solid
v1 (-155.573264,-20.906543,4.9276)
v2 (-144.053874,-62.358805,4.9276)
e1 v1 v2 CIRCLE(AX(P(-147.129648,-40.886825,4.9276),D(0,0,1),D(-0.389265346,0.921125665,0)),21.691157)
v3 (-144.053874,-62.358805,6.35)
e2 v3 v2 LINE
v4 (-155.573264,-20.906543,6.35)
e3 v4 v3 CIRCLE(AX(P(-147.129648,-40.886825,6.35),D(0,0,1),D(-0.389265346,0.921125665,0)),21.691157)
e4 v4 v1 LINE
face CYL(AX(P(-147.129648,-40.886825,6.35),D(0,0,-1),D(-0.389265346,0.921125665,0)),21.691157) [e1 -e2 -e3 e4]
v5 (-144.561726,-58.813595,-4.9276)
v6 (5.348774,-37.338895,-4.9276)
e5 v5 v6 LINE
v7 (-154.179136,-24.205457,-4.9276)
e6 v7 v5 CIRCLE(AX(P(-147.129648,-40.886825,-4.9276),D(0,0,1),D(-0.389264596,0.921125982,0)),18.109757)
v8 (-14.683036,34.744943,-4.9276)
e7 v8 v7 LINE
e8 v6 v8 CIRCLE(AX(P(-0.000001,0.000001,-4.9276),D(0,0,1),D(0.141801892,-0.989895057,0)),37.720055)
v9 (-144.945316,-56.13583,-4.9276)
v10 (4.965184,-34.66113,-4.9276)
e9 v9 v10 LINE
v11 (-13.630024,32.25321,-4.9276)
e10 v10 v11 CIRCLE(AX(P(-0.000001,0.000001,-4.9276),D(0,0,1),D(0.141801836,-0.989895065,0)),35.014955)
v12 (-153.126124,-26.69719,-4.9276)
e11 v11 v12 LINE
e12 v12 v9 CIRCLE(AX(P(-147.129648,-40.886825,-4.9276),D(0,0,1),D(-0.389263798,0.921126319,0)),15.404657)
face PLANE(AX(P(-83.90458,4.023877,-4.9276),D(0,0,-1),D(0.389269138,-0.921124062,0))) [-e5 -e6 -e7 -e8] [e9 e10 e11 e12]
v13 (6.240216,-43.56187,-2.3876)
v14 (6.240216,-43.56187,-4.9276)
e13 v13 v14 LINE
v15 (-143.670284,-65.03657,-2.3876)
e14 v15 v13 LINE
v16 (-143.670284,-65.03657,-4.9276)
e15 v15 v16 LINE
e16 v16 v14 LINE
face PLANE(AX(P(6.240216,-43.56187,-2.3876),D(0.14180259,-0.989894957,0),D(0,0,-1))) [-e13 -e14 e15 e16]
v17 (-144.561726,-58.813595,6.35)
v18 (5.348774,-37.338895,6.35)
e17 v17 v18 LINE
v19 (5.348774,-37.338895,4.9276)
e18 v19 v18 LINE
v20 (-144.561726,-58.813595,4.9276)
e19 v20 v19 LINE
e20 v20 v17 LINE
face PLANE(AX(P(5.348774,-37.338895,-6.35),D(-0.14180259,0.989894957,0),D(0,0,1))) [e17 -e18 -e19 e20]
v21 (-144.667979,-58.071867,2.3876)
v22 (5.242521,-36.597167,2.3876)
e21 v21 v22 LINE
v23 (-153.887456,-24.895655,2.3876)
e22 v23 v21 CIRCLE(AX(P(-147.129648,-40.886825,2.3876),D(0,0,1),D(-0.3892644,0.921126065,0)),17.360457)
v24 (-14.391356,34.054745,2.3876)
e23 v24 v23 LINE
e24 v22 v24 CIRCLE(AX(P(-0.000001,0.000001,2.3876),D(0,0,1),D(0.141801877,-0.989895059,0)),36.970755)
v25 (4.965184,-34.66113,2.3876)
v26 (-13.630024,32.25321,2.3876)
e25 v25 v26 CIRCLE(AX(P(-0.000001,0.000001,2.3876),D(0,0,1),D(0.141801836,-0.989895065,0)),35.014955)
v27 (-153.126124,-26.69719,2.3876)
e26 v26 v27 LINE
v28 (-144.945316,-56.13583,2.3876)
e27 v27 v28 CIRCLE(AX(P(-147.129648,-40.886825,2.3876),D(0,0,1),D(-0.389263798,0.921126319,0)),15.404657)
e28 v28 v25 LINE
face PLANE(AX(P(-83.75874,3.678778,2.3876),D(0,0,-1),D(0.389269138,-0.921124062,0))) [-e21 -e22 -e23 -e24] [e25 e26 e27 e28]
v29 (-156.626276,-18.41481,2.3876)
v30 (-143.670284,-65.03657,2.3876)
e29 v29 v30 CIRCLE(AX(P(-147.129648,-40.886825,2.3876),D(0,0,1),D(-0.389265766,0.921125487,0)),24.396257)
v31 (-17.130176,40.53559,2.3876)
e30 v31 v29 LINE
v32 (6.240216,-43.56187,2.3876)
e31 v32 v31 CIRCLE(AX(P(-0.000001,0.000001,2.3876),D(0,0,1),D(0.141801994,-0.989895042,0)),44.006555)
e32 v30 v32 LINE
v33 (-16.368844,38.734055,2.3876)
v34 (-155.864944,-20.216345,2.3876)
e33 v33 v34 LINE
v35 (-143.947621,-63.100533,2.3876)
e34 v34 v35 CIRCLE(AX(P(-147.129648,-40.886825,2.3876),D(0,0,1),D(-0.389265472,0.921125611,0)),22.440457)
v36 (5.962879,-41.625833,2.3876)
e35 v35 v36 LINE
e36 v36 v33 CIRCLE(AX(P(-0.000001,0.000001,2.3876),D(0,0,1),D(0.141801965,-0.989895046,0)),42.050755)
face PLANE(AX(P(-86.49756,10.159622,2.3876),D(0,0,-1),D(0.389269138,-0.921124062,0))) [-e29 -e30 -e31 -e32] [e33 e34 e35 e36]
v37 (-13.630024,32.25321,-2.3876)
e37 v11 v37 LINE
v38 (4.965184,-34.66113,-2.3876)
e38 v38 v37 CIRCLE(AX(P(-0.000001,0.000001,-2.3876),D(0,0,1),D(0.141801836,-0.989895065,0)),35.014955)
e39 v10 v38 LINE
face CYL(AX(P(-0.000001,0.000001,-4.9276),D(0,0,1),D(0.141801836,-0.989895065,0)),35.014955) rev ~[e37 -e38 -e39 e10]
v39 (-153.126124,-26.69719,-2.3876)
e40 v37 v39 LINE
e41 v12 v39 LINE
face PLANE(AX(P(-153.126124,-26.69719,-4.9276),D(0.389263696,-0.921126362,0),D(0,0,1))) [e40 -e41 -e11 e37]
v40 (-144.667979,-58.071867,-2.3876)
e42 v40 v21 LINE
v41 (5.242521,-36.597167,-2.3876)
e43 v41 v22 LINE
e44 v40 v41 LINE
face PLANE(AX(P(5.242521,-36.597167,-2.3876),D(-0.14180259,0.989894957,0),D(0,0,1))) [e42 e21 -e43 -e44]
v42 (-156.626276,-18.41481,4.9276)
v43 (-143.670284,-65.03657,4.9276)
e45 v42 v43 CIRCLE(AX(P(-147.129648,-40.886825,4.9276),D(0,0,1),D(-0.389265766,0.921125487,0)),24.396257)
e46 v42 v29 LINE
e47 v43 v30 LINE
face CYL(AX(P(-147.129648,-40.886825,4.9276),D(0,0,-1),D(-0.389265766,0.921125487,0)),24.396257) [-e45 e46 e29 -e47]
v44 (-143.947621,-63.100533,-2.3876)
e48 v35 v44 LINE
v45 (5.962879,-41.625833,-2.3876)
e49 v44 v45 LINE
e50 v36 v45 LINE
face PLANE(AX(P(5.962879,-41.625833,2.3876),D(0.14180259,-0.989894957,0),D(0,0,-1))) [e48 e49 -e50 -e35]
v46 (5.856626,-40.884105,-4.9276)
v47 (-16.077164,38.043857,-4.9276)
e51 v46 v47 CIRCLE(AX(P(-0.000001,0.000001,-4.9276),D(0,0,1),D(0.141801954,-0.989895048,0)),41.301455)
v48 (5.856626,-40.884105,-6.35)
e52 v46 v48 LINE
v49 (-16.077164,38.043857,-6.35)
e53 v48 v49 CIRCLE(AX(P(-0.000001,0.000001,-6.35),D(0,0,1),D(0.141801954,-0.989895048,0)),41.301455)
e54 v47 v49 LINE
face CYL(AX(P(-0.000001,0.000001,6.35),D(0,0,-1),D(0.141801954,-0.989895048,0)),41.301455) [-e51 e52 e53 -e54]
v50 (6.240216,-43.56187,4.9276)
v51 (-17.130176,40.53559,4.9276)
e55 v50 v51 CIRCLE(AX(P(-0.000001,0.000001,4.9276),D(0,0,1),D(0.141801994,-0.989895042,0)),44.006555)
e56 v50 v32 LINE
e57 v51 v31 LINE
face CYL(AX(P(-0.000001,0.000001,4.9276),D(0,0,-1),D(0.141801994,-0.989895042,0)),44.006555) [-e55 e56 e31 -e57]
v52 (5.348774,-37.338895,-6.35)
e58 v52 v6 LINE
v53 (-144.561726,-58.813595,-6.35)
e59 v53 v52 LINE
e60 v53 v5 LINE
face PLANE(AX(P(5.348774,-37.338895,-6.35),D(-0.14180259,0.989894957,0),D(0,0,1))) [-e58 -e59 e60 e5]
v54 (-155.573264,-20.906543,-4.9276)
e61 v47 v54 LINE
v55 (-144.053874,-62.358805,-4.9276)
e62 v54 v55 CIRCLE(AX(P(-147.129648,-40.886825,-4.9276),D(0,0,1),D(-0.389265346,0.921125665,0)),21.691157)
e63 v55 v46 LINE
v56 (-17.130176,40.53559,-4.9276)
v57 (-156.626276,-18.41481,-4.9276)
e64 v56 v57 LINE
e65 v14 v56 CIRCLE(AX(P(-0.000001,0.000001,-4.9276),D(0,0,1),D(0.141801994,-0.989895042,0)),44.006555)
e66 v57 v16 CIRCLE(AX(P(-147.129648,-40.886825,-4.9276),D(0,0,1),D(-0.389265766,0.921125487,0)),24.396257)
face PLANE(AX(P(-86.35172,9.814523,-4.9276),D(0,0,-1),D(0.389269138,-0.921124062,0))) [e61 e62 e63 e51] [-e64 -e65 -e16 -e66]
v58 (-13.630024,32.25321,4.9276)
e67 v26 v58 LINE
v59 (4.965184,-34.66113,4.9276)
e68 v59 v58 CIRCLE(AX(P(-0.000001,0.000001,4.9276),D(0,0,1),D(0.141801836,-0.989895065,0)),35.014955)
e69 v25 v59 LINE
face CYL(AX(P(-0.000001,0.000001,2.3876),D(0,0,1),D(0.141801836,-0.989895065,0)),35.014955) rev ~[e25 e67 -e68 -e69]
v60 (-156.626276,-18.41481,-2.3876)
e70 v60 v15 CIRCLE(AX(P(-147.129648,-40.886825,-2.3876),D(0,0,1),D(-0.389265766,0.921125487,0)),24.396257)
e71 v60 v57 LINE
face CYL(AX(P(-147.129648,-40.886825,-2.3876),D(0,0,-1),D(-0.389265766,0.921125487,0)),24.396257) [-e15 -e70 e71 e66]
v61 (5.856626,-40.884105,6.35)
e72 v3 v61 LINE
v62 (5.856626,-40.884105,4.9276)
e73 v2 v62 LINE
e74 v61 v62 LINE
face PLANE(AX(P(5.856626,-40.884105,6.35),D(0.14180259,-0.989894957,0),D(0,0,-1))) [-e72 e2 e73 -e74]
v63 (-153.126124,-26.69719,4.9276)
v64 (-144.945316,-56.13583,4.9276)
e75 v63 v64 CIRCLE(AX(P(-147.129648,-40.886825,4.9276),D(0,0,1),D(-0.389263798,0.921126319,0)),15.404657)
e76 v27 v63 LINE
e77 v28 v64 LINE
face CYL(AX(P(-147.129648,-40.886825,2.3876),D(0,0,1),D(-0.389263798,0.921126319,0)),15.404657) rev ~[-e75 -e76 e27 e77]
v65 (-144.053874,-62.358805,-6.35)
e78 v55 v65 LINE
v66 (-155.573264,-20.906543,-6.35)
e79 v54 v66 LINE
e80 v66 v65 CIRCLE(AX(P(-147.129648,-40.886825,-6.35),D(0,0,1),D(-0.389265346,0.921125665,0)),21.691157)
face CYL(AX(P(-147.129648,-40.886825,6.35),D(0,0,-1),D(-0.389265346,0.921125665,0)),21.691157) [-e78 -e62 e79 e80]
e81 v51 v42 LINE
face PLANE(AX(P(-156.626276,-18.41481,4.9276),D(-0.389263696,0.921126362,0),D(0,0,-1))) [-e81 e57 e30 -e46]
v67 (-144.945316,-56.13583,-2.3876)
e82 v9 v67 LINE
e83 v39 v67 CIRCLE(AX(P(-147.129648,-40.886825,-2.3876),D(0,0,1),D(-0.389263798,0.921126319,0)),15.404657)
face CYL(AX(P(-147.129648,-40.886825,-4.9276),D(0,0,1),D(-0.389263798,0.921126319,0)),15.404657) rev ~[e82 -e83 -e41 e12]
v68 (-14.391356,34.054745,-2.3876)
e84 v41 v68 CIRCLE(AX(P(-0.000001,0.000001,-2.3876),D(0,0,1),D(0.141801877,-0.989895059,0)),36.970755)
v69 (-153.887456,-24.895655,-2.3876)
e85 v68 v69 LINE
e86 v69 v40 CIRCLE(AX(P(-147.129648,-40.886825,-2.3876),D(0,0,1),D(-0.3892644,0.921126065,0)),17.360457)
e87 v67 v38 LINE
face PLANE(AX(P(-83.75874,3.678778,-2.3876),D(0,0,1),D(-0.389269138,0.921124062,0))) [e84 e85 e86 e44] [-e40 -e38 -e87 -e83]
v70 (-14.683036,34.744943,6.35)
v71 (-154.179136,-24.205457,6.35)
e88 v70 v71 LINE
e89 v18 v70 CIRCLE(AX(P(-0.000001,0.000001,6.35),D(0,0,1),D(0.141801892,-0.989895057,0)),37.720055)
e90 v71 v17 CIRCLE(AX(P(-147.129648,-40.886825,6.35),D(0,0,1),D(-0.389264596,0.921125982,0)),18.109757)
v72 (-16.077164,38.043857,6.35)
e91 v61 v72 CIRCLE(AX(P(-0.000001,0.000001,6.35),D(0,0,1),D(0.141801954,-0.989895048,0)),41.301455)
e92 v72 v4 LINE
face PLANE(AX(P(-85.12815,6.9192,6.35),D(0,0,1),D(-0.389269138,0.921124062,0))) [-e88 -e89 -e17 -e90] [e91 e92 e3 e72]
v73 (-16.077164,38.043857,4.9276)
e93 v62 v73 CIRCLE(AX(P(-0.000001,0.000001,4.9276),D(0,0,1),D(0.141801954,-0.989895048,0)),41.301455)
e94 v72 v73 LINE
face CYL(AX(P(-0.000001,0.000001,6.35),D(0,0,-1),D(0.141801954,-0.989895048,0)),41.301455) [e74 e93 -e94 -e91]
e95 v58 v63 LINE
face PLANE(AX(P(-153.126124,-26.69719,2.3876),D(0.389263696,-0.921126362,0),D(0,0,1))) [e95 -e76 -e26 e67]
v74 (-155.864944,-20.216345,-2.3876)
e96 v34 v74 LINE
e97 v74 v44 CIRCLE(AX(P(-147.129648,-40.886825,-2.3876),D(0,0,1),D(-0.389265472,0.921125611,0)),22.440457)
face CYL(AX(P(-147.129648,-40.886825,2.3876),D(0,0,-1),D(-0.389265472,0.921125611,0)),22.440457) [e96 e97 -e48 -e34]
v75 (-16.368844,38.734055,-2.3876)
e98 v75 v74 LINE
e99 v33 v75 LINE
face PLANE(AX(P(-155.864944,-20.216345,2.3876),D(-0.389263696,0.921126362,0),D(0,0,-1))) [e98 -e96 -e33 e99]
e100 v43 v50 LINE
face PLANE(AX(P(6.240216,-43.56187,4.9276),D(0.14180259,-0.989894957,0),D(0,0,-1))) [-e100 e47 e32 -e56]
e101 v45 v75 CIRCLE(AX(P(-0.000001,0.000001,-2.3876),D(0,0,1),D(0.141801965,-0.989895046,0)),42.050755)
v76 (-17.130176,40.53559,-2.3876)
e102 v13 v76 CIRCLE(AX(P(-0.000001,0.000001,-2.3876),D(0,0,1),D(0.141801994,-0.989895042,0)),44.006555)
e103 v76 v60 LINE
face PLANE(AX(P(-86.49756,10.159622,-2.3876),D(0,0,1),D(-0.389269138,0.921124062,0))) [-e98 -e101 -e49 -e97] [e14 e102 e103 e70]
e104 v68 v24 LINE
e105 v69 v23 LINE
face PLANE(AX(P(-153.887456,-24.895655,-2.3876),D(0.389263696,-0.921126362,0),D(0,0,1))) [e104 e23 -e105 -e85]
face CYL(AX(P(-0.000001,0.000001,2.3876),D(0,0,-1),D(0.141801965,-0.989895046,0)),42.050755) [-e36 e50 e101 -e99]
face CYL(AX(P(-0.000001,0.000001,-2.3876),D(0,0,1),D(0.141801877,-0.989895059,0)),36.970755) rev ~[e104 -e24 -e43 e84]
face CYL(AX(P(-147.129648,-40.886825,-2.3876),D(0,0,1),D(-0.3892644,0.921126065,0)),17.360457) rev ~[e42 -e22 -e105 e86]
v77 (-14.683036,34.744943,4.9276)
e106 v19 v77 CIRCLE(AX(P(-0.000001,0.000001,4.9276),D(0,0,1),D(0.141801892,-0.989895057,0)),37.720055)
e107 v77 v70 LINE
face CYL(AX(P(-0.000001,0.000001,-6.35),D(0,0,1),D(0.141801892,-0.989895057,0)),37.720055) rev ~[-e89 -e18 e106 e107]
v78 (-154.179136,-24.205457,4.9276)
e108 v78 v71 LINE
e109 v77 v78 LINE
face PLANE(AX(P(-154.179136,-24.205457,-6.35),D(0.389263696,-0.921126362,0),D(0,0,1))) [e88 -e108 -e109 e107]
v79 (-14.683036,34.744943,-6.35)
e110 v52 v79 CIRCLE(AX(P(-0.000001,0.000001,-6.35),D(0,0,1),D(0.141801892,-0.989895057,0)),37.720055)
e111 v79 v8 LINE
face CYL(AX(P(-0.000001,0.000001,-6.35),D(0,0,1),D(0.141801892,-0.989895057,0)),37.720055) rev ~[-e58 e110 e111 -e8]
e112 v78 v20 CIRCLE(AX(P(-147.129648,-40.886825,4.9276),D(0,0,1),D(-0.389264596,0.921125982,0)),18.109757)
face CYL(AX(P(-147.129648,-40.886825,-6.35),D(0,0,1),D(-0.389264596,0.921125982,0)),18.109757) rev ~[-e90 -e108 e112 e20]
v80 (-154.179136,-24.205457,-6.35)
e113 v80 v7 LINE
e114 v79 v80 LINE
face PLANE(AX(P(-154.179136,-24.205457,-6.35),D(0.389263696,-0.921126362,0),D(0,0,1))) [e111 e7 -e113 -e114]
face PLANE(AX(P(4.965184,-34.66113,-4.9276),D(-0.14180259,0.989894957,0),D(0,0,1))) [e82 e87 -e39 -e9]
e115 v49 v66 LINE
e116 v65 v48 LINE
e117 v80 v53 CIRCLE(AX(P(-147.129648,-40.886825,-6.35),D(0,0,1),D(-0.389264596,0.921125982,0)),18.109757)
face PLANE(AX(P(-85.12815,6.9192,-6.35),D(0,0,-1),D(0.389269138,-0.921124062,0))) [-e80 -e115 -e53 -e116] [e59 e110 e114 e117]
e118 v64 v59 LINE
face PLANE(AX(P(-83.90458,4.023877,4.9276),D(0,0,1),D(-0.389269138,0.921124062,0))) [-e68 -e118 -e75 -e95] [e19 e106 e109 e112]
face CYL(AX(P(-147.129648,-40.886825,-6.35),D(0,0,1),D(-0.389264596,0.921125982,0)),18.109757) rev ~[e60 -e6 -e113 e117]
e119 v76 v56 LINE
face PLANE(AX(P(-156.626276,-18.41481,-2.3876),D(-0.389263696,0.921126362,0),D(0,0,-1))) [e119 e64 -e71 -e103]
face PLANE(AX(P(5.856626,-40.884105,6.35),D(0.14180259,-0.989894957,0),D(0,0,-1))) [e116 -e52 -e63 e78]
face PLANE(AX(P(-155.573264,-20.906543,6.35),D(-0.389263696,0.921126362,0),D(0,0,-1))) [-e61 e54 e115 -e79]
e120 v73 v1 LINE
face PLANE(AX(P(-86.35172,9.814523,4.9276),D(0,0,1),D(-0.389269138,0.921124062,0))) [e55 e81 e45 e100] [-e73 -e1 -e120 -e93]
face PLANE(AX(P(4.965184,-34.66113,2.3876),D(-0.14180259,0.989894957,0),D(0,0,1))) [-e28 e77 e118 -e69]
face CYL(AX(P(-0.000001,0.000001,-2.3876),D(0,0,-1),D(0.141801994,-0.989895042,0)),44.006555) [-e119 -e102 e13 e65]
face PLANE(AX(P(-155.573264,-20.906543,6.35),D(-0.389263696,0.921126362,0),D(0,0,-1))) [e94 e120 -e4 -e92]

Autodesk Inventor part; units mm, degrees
ref_plane "Work Plane2" through (-147.1297, -40.8868, 0) normal (-1, 0, 0) x (0, 0, 1)
ref_plane "Work Plane3" through (0, 0, 0) normal (-0.9845658, -0.1750148, 0) x (0, 0, 1)
sketch "Path" plane through (0, 0, 0) normal (0, 0, 1) x (1, 0, 0)
  arc A0 (-154.8762, -22.556) -> (-144.3078, -60.5862) centre (-147.1297, -40.8868) ccw
  arc A1 (5.6027, -39.1115) -> (-15.3801, 36.3944) centre (0, 0) ccw
  line L0 (5.6027, -39.1115) -> (-144.3078, -60.5862)
  line L1 (-154.8762, -22.556) -> (-15.3801, 36.3944)
  dimension "d31" = 8.9916
ref_plane "Section Plane" through (-144.3078, -60.5862, 0) normal (0.9898949, 0.1418026, 0) x (0, 0, 1)
sketch "Section Sketch" plane through (-144.3078, -60.5862, 0) normal (0.9898949, 0.1418026, 0) x (0, 0, 1)
  line L0 (-6.35, -1.7907) -> (6.35, -1.7907)
  line L1 (6.35, -1.7907) -> (6.35, 1.7907)
  line L2 (6.35, 1.7907) -> (-6.35, 1.7907)
  line L3 (-6.35, 1.7907) -> (-6.35, -1.7907)
  line L4 (-2.3876, -2.54) -> (2.3876, -2.54)
  line L5 (2.3876, -2.54) -> (2.3876, 2.54)
  line L6 (2.3876, 2.54) -> (-2.3876, 2.54)
  line L7 (-2.3876, 2.54) -> (-2.3876, -2.54)
  line L8 (-2.3876, 0) -> (2.3876, 0) construction
  line L9 (-4.9276, -4.4958) -> (-2.3876, -4.4958)
  line L10 (-2.3876, -4.4958) -> (-2.3876, 4.4958)
  line L11 (-2.3876, 4.4958) -> (-4.9276, 4.4958)
  line L12 (-4.9276, 4.4958) -> (-4.9276, -4.4958)
  line L13 (2.3876, -4.4958) -> (4.9276, -4.4958)
  line L14 (4.9276, -4.4958) -> (4.9276, 4.4958)
  line L15 (4.9276, 4.4958) -> (2.3876, 4.4958)
  line L16 (2.3876, 4.4958) -> (2.3876, -4.4958)
  line L17 (-6.35, 0) -> (6.35, 0) construction
  point P0 (0, 0)
  point P1 (0, 0)
  dimension "d21" = 3.5814
  dimension "d22" = 5.08
  dimension "d23" = 4.7752
  dimension "d24" = 2.54
  dimension "d31" = 8.9916
  dimension "d32" = 12.7
sweep "Solid" add profiles "Section Sketch" path "Path"
pattern_of_one "Strand Pattern"
equation "\"d21\" = da_d2"
equation "\"d22\" = da_d1"
equation "\"d23\" = da_b1"
equation "\"d24\" = da_t1 + da_t2"
equation "\"d30\" = da_pt"
equation "\"da_p\" = 9.525"
equation "\"da_b1\" = 4.7752"
equation "\"da_h2\" = 8.9916"
equation "\"da_h3\" = 7.7978"
equation "\"da_d1\" = 5.08"
equation "\"da_d2\" = 3.5814"
equation "\"da_pt\" = 10.1346"
equation "\"da_b\" = 12.7"
equation "\"da_t1\" = 1.27"
equation "\"da_t2\" = 1.27"
properties part number "Roller Chain"
